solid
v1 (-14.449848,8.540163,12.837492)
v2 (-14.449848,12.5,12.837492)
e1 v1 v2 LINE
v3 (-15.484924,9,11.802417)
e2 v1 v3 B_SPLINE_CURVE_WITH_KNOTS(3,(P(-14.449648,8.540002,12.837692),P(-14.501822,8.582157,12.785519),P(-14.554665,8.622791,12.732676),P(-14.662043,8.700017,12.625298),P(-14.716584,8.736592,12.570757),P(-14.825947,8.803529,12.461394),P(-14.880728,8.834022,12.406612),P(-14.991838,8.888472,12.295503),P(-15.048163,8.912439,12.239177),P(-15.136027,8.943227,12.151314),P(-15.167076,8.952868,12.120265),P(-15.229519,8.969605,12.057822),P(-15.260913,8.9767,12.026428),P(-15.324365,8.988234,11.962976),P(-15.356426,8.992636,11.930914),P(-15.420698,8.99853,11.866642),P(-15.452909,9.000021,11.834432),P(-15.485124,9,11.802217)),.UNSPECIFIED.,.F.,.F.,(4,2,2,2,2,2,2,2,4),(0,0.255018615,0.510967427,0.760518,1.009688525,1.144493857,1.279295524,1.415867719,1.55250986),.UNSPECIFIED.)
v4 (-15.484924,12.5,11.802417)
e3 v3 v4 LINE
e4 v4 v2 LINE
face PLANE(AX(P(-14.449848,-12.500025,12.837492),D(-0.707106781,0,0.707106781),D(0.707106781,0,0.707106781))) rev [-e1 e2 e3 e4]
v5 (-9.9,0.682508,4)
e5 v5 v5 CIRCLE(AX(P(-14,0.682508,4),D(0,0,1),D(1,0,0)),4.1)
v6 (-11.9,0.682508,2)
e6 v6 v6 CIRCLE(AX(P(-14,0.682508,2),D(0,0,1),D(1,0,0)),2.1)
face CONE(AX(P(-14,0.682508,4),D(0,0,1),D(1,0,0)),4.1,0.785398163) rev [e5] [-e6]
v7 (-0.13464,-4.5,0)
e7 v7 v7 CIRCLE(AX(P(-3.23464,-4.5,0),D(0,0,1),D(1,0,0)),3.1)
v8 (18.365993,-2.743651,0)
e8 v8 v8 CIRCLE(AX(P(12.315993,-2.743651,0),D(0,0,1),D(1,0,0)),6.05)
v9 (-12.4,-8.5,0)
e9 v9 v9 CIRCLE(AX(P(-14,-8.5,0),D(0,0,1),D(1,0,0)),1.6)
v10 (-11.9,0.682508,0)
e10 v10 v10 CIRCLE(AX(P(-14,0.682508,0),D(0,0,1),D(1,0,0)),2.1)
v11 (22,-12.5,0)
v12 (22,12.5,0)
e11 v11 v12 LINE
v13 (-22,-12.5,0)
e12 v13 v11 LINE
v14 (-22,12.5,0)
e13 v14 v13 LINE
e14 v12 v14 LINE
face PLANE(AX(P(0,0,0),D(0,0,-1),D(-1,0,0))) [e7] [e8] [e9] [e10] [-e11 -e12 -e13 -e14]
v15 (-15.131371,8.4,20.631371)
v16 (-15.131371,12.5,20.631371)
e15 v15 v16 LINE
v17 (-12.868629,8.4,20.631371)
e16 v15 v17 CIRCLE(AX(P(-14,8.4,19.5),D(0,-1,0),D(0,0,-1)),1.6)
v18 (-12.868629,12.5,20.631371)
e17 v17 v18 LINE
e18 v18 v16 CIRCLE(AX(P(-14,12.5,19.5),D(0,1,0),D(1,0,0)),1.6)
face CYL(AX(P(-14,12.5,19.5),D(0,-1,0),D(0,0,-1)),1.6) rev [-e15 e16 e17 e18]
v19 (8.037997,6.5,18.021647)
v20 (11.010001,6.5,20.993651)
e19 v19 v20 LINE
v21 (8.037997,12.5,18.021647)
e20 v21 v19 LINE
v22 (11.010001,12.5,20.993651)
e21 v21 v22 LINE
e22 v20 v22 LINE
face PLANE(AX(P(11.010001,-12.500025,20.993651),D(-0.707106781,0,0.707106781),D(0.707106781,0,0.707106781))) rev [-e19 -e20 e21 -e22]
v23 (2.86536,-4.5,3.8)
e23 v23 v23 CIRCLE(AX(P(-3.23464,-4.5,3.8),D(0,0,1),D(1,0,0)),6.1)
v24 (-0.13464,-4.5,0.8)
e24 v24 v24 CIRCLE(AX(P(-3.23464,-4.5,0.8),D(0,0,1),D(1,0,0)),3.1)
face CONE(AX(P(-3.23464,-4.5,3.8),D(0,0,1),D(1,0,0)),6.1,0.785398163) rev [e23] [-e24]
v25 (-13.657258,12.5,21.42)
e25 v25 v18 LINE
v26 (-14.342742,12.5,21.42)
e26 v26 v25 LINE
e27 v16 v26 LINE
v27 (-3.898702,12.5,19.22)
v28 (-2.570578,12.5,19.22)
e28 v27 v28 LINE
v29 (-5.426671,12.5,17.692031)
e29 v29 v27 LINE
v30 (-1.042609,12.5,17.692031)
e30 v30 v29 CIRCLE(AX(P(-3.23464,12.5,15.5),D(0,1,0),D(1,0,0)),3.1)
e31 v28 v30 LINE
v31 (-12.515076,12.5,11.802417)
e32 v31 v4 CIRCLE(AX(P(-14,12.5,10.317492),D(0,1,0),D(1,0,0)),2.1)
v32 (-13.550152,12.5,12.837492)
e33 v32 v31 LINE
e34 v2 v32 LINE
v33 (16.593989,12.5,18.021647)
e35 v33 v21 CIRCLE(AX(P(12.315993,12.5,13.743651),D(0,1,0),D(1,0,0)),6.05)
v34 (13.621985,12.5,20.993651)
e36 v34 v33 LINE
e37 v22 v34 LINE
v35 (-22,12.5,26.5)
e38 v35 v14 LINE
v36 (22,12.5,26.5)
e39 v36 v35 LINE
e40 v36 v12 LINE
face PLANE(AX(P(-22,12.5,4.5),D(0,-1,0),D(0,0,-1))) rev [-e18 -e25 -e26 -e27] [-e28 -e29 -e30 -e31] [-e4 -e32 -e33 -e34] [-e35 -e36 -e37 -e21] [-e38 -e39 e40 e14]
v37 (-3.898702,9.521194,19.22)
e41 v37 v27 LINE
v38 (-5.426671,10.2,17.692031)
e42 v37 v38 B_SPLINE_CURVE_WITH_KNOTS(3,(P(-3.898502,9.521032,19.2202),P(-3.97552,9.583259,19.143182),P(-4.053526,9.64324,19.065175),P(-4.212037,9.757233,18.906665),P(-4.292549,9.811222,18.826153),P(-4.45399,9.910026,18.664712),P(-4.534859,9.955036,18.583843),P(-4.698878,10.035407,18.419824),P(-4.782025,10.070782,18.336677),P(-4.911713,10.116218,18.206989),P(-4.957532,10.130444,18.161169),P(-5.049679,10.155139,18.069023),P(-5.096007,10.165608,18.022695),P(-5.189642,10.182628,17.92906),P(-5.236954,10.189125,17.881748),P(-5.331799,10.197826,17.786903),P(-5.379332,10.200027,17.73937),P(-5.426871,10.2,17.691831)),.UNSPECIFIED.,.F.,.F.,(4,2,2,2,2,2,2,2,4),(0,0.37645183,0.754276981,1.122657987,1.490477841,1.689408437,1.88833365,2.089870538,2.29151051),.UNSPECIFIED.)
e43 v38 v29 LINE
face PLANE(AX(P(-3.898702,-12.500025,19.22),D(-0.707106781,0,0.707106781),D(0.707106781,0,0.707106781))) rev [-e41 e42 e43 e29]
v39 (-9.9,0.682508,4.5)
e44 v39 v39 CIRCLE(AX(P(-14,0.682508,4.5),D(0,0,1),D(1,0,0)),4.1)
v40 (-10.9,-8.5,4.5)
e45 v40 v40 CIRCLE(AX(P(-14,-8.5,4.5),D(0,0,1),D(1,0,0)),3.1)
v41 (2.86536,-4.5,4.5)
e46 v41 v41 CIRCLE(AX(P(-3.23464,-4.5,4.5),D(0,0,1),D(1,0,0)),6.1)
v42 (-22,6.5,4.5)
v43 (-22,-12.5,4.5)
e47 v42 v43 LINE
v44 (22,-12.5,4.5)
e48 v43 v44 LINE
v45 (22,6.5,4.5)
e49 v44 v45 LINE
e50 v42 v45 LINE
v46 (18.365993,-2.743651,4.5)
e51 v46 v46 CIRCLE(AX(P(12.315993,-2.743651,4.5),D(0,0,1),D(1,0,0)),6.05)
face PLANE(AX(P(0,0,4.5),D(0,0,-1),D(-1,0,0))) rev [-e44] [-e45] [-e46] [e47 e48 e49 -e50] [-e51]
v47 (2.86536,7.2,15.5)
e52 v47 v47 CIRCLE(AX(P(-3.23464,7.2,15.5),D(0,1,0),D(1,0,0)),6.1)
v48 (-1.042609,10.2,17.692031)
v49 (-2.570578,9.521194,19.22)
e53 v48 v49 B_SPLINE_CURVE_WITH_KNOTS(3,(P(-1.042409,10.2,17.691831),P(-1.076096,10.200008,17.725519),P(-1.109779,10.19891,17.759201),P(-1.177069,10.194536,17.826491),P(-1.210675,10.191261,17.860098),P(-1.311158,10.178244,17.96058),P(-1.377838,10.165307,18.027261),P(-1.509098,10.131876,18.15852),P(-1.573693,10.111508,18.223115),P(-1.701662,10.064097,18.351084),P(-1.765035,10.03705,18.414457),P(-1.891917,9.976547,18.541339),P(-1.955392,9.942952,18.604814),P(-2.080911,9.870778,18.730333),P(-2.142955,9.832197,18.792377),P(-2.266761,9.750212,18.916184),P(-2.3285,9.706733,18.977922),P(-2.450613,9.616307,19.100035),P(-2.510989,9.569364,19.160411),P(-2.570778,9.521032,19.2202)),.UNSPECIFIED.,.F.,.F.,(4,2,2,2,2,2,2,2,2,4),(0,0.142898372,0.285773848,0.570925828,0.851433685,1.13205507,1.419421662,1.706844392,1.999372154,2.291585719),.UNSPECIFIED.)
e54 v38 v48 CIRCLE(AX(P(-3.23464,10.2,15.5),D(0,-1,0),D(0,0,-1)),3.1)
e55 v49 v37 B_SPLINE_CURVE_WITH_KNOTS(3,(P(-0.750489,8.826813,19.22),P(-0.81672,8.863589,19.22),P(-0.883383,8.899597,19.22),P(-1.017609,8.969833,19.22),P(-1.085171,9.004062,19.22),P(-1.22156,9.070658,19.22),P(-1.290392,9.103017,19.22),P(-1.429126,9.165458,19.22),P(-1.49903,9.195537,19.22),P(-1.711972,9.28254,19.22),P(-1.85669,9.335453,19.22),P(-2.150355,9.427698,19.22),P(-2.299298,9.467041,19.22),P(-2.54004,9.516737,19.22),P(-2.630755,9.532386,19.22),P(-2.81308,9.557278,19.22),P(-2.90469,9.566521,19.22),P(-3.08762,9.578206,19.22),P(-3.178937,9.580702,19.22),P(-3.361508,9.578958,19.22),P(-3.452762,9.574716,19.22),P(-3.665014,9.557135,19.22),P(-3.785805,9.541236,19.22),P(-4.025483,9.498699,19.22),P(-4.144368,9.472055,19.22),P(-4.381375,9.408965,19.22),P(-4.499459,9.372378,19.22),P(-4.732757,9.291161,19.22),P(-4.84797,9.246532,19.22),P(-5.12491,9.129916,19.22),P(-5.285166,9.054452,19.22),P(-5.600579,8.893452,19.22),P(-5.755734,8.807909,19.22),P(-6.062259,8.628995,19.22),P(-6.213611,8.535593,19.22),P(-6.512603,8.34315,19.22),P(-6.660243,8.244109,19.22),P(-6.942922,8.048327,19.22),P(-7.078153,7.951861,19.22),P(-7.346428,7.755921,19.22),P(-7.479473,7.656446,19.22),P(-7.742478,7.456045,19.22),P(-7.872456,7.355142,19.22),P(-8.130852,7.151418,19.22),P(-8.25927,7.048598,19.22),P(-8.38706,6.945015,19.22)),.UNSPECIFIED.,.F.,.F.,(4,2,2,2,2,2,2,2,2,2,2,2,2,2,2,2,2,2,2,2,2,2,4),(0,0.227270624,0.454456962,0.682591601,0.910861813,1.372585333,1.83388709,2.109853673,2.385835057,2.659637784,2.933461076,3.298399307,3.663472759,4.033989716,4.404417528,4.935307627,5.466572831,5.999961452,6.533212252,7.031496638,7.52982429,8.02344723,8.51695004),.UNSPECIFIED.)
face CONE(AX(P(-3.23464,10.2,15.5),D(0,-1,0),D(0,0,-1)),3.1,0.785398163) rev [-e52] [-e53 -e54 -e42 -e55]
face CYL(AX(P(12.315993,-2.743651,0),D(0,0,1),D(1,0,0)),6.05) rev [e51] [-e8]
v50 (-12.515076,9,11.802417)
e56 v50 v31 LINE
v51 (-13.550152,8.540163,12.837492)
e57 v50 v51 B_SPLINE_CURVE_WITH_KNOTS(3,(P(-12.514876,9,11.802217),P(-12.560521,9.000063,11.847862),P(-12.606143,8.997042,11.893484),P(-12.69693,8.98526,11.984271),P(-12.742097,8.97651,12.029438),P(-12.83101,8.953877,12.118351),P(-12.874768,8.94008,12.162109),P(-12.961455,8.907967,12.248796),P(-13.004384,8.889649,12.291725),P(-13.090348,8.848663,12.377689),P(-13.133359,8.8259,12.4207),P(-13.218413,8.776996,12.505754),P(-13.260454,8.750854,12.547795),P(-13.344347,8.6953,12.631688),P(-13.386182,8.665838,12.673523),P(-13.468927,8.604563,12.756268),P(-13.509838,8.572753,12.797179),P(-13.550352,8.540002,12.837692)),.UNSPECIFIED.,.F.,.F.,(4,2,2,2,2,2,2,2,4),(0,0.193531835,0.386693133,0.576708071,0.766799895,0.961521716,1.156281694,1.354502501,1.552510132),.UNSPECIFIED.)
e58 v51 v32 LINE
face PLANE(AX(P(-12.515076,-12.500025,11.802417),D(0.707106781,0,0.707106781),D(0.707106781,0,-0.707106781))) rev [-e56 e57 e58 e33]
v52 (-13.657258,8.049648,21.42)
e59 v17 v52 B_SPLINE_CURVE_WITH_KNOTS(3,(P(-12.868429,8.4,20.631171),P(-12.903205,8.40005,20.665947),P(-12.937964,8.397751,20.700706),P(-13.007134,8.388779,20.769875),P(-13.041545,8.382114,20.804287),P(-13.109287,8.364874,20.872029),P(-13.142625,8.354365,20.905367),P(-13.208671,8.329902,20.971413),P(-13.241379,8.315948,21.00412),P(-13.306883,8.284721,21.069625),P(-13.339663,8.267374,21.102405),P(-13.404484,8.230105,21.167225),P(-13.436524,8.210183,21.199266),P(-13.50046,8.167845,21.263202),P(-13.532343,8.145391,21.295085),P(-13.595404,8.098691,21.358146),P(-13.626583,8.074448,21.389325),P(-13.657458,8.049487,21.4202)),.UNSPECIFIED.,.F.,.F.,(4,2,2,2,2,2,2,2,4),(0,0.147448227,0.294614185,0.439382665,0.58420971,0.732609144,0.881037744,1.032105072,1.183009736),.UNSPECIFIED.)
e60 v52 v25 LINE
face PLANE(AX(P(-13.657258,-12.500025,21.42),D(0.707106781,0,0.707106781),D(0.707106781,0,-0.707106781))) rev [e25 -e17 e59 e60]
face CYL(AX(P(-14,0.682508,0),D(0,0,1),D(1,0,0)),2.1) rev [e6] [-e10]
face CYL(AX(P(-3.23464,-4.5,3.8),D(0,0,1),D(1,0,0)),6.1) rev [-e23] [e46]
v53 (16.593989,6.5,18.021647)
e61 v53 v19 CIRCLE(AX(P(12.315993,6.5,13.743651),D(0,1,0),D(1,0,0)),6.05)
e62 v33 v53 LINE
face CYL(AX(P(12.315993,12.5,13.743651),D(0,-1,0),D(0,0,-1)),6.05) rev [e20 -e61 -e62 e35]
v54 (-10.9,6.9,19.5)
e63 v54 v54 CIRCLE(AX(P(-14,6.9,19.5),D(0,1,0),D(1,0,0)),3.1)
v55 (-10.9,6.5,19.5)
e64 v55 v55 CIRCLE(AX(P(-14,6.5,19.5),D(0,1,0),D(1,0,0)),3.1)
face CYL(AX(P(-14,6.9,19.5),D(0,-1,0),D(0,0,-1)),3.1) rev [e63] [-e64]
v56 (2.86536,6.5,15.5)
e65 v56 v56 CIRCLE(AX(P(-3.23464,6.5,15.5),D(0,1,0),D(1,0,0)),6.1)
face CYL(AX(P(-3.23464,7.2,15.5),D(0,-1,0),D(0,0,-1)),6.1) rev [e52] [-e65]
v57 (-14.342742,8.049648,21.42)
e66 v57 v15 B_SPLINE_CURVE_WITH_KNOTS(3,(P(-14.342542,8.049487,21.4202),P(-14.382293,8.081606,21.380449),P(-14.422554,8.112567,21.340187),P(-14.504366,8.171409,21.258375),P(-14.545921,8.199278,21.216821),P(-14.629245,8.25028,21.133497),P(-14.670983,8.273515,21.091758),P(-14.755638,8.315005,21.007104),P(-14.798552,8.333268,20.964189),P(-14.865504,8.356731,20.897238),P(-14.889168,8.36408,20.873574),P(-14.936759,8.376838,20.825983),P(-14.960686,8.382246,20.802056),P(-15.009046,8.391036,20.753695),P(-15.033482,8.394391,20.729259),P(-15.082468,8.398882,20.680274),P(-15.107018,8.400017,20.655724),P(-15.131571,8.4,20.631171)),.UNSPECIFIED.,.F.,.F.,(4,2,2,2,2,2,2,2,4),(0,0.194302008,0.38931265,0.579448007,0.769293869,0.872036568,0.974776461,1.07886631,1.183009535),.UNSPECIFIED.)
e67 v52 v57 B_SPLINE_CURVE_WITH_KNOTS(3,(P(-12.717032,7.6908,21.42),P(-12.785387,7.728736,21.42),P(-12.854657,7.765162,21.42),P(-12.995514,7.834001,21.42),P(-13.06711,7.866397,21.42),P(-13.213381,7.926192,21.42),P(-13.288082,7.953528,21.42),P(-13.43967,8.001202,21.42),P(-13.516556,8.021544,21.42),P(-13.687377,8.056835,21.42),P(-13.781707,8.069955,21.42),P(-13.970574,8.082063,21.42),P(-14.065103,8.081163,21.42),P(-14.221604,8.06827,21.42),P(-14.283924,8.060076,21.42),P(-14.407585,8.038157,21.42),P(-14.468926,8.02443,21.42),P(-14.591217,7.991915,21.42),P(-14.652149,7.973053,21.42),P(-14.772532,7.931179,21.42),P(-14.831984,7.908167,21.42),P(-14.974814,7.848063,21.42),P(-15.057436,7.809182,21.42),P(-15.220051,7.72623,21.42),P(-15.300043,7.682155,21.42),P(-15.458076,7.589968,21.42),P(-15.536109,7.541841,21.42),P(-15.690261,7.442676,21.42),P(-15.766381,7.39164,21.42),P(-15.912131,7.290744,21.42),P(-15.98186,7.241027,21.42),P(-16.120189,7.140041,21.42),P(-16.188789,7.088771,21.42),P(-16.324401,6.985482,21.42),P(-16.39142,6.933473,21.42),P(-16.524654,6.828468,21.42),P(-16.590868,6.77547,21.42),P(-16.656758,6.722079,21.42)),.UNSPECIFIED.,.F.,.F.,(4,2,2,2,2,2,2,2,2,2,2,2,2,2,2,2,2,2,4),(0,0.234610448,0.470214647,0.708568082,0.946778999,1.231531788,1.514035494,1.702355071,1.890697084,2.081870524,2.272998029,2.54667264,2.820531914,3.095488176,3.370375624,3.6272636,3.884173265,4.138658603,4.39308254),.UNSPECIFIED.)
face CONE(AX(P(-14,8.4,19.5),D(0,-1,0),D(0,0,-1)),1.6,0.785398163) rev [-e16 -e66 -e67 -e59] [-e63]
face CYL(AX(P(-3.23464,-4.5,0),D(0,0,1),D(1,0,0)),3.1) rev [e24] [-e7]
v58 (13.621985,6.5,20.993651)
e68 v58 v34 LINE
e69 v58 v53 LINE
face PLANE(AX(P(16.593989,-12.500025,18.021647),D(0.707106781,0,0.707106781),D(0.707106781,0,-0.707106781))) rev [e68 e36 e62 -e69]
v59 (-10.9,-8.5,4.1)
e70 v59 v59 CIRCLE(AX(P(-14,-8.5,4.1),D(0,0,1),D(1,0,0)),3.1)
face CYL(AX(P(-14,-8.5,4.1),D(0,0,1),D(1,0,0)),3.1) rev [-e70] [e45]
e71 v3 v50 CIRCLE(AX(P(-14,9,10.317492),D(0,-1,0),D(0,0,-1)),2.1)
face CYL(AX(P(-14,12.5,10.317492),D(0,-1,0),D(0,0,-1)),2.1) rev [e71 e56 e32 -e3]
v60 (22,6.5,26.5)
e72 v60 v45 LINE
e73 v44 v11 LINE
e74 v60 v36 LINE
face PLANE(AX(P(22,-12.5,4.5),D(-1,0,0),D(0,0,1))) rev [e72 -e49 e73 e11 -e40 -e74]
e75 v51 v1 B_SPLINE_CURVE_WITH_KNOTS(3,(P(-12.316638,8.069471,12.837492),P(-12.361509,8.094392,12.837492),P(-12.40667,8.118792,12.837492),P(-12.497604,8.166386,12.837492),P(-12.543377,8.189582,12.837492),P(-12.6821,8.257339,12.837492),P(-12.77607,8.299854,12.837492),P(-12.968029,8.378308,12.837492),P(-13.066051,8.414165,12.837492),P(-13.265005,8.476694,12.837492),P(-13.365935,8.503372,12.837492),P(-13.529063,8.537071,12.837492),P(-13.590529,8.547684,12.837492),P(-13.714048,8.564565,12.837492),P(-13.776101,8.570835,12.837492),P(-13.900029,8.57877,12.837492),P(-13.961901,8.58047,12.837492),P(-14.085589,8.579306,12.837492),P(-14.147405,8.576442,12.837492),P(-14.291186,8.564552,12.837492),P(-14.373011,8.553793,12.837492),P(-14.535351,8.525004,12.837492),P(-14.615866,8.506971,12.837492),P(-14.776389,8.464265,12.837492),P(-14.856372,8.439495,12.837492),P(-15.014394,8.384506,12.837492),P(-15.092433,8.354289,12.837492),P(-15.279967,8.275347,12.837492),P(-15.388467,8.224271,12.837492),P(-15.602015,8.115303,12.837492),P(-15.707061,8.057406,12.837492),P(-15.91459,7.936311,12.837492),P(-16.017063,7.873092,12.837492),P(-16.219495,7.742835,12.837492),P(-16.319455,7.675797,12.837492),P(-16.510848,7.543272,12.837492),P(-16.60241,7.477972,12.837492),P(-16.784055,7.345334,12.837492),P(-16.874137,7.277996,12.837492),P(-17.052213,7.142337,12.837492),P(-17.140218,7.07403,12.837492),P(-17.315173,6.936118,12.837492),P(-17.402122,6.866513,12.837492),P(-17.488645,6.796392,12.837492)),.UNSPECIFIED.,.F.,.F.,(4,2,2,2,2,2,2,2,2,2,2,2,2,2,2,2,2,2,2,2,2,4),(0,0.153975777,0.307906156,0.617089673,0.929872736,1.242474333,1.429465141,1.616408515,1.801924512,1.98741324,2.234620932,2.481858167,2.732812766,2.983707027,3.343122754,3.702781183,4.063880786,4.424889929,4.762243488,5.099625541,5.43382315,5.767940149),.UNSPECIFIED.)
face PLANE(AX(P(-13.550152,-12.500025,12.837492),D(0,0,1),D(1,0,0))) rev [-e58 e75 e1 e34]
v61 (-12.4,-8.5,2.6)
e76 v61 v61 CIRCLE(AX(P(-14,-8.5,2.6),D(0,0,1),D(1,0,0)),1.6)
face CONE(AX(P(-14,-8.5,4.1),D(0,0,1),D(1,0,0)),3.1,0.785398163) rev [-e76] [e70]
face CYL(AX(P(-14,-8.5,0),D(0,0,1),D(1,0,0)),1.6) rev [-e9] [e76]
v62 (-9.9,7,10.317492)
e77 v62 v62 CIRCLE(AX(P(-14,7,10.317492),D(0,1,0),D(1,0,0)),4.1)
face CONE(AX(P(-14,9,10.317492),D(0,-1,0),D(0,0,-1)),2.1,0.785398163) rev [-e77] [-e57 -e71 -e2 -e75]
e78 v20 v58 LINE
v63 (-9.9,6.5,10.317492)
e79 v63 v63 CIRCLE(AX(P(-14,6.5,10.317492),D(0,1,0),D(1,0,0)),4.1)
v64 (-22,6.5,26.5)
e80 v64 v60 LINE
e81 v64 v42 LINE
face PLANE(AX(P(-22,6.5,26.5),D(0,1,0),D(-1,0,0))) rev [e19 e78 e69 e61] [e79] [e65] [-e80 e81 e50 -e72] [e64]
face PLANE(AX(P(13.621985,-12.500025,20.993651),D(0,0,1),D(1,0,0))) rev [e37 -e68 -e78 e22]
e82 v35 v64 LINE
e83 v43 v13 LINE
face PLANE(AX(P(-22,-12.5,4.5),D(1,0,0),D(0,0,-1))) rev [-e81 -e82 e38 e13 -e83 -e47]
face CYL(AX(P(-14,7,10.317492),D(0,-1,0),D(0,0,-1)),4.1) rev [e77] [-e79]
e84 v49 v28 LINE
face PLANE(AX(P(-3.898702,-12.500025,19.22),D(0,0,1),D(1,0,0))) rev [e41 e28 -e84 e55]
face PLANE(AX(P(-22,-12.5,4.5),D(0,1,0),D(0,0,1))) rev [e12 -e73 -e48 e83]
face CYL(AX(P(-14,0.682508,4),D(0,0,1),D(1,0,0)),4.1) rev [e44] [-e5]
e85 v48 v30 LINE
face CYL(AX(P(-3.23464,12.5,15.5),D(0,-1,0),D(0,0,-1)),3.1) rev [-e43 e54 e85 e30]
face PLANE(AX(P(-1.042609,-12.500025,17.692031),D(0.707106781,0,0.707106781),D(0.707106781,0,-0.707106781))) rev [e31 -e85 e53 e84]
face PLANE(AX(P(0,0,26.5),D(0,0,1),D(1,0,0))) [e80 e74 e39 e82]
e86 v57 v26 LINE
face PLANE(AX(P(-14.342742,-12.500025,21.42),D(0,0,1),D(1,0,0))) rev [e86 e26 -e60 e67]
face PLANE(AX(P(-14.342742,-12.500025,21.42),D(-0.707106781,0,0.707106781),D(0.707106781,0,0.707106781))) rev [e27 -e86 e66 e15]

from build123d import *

# Parameters (mm, degrees)
SKETCH1_W                = 44
SKETCH1_H                = 25
BOSS_EXTRUDE1_DEPTH      = 4.5
SKETCH2_W                = 44
SKETCH2_H                = 6
BOSS_EXTRUDE2_DEPTH      = 22
SKETCH3_R                = 1.6
SKETCH3_R_2              = 2.1
SKETCH3_R_3              = 3.1
SKETCH3_R_4              = 6.05
CUT_EXTRUDE1_DEPTH       = 34.529837459
SKETCH4_R                = 6.1
CUT_EXTRUDE2_DEPTH       = 0.7
SKETCH5_R                = 4.1
CUT_EXTRUDE3_DEPTH       = 0.5
SKETCH6_R                = 3.1
CUT_EXTRUDE4_DEPTH       = 0.4
CHAMFER4_SIZE            = 3
CHAMFER5_SIZE            = 2
CHAMFER6_SIZE            = 1.5
CHAMFER4_OF_MIRROR1_SIZE = 3
CHAMFER5_OF_MIRROR1_SIZE = 2
CHAMFER6_OF_MIRROR1_SIZE = 1.5
CUT_EXTRUDE5_DEPTH       = 43.558782877


with BuildPart() as part:
    # Sketch1 → Boss-Extrude1 (new body)
    with BuildSketch(Plane.XY):
        Rectangle(SKETCH1_W, SKETCH1_H)
    extrude(amount=BOSS_EXTRUDE1_DEPTH)

    # Sketch2 → Boss-Extrude2 (add)
    with BuildSketch(Plane.XY.offset(4.5)):
        with Locations((0, 9.5)):
            Rectangle(SKETCH2_W, SKETCH2_H)
    extrude(amount=BOSS_EXTRUDE2_DEPTH)

    # Sketch3 → Cut-Extrude1 (cut, through all)
    with BuildSketch(Plane.XY.offset(4.5)):
        with Locations((-14, -8.5)):
            Circle(SKETCH3_R)
        with Locations((-14, 0.682507664)):
            Circle(SKETCH3_R_2)
        with Locations((-3.234639789, -4.5)):
            Circle(SKETCH3_R_3)
        with Locations((12.315992983, -2.743651106)):
            Circle(SKETCH3_R_4)
    cut_extrude1 = extrude(amount=-CUT_EXTRUDE1_DEPTH, mode=Mode.SUBTRACT)

    # Sketch4 → Cut-Extrude2 (cut)
    with BuildSketch(Plane.XY.offset(4.5)):
        with Locations((-3.234639789, -4.5)):
            Circle(SKETCH4_R)
    cut_extrude2 = extrude(amount=-CUT_EXTRUDE2_DEPTH, mode=Mode.SUBTRACT)

    # Sketch5 → Cut-Extrude3 (cut)
    with BuildSketch(Plane.XY.offset(4.5)):
        with Locations((-14, 0.682507664)):
            Circle(SKETCH5_R)
    cut_extrude3 = extrude(amount=-CUT_EXTRUDE3_DEPTH, mode=Mode.SUBTRACT)

    # Sketch6 → Cut-Extrude4 (cut)
    with BuildSketch(Plane.XY.offset(4.5)):
        with Locations((-14, -8.5)):
            Circle(SKETCH6_R)
    cut_extrude4 = extrude(amount=-CUT_EXTRUDE4_DEPTH, mode=Mode.SUBTRACT)

    # Chamfer4
    chamfer4_edges = [part.edges().sort_by_distance(p)[0] for p in [
        (-6.334639789, -4.5, 3.8),
    ]]
    chamfer(chamfer4_edges, length=CHAMFER4_SIZE - 0.0001)  # a hair under: the kernel refuses the full size

    # Chamfer5
    chamfer5_edges = [part.edges().sort_by_distance(p)[0] for p in [
        (-16.1, 0.682507664, 4),
    ]]
    chamfer(chamfer5_edges, length=CHAMFER5_SIZE - 0.0001)  # a hair under: the kernel refuses the full size

    # Chamfer6
    chamfer6_edges = [part.edges().sort_by_distance(p)[0] for p in [
        (-15.6, -8.5, 4.1),
    ]]
    chamfer(chamfer6_edges, length=CHAMFER6_SIZE - 0.0001)  # a hair under: the kernel refuses the full size

    # Mirror1: Cut-Extrude1, Cut-Extrude2, Cut-Extrude3, Cut-Extrude4 across plane
    add(cut_extrude1.mirror(Plane(origin=(0, 5.5, 5.5), x_dir=(0, -0.7071067811865512, 0.7071067811865439), z_dir=(0, -0.7071067811865438, -0.7071067811865512))), mode=Mode.SUBTRACT)
    add(cut_extrude2.mirror(Plane(origin=(0, 5.5, 5.5), x_dir=(0, -0.7071067811865512, 0.7071067811865439), z_dir=(0, -0.7071067811865438, -0.7071067811865512))), mode=Mode.SUBTRACT)
    add(cut_extrude3.mirror(Plane(origin=(0, 5.5, 5.5), x_dir=(0, -0.7071067811865512, 0.7071067811865439), z_dir=(0, -0.7071067811865438, -0.7071067811865512))), mode=Mode.SUBTRACT)
    add(cut_extrude4.mirror(Plane(origin=(0, 5.5, 5.5), x_dir=(0, -0.7071067811865512, 0.7071067811865439), z_dir=(0, -0.7071067811865438, -0.7071067811865512))), mode=Mode.SUBTRACT)

    # Chamfer4 of Mirror1
    chamfer4_of_mirror1_edges = [part.edges().sort_by_distance(p)[0] for p in [
        (-6.334639789, 7.2, 15.5),
    ]]
    chamfer(chamfer4_of_mirror1_edges, length=CHAMFER4_OF_MIRROR1_SIZE - 0.0001)  # a hair under: the kernel refuses the full size

    # Chamfer5 of Mirror1
    chamfer5_of_mirror1_edges = [part.edges().sort_by_distance(p)[0] for p in [
        (-16.1, 7, 10.317492336),
    ]]
    chamfer(chamfer5_of_mirror1_edges, length=CHAMFER5_OF_MIRROR1_SIZE - 0.0001)  # a hair under: the kernel refuses the full size

    # Chamfer6 of Mirror1
    chamfer6_of_mirror1_edges = [part.edges().sort_by_distance(p)[0] for p in [
        (-15.6, 6.9, 19.5),
    ]]
    chamfer(chamfer6_of_mirror1_edges, length=CHAMFER6_OF_MIRROR1_SIZE - 0.0001)  # a hair under: the kernel refuses the full size

    # Sketch7 → Cut-Extrude5 (cut, through all)
    with BuildSketch(Plane(origin=(0, 12.5, 0), x_dir=(1, 0, 0), z_dir=(0, 1, 0))):
        Polygon((-14.3427417, -21.42), (-13.6572583, -21.42), (-12.86862915, -20.63137085), (-14, -19.5), (-15.13137085, -20.63137085), align=None)
        Polygon((-3.234639789, -15.5), (-1.042608767, -17.692031022), (-2.570577745, -19.22), (-3.898701832, -19.22), (-5.42667081, -17.692031022), align=None)
        Polygon((12.315992983, -13.743651106), (16.593989009, -18.021647132), (13.621985035, -20.993651106), (11.010000931, -20.993651106), (8.037996957, -18.021647132), align=None)
        Polygon((-14, -10.317492336), (-12.51507576, -11.802416576), (-13.550151519, -12.837492336), (-14.449848481, -12.837492336), (-15.48492424, -11.802416576), align=None)
    extrude(amount=-CUT_EXTRUDE5_DEPTH, mode=Mode.SUBTRACT)


solid = part.part
